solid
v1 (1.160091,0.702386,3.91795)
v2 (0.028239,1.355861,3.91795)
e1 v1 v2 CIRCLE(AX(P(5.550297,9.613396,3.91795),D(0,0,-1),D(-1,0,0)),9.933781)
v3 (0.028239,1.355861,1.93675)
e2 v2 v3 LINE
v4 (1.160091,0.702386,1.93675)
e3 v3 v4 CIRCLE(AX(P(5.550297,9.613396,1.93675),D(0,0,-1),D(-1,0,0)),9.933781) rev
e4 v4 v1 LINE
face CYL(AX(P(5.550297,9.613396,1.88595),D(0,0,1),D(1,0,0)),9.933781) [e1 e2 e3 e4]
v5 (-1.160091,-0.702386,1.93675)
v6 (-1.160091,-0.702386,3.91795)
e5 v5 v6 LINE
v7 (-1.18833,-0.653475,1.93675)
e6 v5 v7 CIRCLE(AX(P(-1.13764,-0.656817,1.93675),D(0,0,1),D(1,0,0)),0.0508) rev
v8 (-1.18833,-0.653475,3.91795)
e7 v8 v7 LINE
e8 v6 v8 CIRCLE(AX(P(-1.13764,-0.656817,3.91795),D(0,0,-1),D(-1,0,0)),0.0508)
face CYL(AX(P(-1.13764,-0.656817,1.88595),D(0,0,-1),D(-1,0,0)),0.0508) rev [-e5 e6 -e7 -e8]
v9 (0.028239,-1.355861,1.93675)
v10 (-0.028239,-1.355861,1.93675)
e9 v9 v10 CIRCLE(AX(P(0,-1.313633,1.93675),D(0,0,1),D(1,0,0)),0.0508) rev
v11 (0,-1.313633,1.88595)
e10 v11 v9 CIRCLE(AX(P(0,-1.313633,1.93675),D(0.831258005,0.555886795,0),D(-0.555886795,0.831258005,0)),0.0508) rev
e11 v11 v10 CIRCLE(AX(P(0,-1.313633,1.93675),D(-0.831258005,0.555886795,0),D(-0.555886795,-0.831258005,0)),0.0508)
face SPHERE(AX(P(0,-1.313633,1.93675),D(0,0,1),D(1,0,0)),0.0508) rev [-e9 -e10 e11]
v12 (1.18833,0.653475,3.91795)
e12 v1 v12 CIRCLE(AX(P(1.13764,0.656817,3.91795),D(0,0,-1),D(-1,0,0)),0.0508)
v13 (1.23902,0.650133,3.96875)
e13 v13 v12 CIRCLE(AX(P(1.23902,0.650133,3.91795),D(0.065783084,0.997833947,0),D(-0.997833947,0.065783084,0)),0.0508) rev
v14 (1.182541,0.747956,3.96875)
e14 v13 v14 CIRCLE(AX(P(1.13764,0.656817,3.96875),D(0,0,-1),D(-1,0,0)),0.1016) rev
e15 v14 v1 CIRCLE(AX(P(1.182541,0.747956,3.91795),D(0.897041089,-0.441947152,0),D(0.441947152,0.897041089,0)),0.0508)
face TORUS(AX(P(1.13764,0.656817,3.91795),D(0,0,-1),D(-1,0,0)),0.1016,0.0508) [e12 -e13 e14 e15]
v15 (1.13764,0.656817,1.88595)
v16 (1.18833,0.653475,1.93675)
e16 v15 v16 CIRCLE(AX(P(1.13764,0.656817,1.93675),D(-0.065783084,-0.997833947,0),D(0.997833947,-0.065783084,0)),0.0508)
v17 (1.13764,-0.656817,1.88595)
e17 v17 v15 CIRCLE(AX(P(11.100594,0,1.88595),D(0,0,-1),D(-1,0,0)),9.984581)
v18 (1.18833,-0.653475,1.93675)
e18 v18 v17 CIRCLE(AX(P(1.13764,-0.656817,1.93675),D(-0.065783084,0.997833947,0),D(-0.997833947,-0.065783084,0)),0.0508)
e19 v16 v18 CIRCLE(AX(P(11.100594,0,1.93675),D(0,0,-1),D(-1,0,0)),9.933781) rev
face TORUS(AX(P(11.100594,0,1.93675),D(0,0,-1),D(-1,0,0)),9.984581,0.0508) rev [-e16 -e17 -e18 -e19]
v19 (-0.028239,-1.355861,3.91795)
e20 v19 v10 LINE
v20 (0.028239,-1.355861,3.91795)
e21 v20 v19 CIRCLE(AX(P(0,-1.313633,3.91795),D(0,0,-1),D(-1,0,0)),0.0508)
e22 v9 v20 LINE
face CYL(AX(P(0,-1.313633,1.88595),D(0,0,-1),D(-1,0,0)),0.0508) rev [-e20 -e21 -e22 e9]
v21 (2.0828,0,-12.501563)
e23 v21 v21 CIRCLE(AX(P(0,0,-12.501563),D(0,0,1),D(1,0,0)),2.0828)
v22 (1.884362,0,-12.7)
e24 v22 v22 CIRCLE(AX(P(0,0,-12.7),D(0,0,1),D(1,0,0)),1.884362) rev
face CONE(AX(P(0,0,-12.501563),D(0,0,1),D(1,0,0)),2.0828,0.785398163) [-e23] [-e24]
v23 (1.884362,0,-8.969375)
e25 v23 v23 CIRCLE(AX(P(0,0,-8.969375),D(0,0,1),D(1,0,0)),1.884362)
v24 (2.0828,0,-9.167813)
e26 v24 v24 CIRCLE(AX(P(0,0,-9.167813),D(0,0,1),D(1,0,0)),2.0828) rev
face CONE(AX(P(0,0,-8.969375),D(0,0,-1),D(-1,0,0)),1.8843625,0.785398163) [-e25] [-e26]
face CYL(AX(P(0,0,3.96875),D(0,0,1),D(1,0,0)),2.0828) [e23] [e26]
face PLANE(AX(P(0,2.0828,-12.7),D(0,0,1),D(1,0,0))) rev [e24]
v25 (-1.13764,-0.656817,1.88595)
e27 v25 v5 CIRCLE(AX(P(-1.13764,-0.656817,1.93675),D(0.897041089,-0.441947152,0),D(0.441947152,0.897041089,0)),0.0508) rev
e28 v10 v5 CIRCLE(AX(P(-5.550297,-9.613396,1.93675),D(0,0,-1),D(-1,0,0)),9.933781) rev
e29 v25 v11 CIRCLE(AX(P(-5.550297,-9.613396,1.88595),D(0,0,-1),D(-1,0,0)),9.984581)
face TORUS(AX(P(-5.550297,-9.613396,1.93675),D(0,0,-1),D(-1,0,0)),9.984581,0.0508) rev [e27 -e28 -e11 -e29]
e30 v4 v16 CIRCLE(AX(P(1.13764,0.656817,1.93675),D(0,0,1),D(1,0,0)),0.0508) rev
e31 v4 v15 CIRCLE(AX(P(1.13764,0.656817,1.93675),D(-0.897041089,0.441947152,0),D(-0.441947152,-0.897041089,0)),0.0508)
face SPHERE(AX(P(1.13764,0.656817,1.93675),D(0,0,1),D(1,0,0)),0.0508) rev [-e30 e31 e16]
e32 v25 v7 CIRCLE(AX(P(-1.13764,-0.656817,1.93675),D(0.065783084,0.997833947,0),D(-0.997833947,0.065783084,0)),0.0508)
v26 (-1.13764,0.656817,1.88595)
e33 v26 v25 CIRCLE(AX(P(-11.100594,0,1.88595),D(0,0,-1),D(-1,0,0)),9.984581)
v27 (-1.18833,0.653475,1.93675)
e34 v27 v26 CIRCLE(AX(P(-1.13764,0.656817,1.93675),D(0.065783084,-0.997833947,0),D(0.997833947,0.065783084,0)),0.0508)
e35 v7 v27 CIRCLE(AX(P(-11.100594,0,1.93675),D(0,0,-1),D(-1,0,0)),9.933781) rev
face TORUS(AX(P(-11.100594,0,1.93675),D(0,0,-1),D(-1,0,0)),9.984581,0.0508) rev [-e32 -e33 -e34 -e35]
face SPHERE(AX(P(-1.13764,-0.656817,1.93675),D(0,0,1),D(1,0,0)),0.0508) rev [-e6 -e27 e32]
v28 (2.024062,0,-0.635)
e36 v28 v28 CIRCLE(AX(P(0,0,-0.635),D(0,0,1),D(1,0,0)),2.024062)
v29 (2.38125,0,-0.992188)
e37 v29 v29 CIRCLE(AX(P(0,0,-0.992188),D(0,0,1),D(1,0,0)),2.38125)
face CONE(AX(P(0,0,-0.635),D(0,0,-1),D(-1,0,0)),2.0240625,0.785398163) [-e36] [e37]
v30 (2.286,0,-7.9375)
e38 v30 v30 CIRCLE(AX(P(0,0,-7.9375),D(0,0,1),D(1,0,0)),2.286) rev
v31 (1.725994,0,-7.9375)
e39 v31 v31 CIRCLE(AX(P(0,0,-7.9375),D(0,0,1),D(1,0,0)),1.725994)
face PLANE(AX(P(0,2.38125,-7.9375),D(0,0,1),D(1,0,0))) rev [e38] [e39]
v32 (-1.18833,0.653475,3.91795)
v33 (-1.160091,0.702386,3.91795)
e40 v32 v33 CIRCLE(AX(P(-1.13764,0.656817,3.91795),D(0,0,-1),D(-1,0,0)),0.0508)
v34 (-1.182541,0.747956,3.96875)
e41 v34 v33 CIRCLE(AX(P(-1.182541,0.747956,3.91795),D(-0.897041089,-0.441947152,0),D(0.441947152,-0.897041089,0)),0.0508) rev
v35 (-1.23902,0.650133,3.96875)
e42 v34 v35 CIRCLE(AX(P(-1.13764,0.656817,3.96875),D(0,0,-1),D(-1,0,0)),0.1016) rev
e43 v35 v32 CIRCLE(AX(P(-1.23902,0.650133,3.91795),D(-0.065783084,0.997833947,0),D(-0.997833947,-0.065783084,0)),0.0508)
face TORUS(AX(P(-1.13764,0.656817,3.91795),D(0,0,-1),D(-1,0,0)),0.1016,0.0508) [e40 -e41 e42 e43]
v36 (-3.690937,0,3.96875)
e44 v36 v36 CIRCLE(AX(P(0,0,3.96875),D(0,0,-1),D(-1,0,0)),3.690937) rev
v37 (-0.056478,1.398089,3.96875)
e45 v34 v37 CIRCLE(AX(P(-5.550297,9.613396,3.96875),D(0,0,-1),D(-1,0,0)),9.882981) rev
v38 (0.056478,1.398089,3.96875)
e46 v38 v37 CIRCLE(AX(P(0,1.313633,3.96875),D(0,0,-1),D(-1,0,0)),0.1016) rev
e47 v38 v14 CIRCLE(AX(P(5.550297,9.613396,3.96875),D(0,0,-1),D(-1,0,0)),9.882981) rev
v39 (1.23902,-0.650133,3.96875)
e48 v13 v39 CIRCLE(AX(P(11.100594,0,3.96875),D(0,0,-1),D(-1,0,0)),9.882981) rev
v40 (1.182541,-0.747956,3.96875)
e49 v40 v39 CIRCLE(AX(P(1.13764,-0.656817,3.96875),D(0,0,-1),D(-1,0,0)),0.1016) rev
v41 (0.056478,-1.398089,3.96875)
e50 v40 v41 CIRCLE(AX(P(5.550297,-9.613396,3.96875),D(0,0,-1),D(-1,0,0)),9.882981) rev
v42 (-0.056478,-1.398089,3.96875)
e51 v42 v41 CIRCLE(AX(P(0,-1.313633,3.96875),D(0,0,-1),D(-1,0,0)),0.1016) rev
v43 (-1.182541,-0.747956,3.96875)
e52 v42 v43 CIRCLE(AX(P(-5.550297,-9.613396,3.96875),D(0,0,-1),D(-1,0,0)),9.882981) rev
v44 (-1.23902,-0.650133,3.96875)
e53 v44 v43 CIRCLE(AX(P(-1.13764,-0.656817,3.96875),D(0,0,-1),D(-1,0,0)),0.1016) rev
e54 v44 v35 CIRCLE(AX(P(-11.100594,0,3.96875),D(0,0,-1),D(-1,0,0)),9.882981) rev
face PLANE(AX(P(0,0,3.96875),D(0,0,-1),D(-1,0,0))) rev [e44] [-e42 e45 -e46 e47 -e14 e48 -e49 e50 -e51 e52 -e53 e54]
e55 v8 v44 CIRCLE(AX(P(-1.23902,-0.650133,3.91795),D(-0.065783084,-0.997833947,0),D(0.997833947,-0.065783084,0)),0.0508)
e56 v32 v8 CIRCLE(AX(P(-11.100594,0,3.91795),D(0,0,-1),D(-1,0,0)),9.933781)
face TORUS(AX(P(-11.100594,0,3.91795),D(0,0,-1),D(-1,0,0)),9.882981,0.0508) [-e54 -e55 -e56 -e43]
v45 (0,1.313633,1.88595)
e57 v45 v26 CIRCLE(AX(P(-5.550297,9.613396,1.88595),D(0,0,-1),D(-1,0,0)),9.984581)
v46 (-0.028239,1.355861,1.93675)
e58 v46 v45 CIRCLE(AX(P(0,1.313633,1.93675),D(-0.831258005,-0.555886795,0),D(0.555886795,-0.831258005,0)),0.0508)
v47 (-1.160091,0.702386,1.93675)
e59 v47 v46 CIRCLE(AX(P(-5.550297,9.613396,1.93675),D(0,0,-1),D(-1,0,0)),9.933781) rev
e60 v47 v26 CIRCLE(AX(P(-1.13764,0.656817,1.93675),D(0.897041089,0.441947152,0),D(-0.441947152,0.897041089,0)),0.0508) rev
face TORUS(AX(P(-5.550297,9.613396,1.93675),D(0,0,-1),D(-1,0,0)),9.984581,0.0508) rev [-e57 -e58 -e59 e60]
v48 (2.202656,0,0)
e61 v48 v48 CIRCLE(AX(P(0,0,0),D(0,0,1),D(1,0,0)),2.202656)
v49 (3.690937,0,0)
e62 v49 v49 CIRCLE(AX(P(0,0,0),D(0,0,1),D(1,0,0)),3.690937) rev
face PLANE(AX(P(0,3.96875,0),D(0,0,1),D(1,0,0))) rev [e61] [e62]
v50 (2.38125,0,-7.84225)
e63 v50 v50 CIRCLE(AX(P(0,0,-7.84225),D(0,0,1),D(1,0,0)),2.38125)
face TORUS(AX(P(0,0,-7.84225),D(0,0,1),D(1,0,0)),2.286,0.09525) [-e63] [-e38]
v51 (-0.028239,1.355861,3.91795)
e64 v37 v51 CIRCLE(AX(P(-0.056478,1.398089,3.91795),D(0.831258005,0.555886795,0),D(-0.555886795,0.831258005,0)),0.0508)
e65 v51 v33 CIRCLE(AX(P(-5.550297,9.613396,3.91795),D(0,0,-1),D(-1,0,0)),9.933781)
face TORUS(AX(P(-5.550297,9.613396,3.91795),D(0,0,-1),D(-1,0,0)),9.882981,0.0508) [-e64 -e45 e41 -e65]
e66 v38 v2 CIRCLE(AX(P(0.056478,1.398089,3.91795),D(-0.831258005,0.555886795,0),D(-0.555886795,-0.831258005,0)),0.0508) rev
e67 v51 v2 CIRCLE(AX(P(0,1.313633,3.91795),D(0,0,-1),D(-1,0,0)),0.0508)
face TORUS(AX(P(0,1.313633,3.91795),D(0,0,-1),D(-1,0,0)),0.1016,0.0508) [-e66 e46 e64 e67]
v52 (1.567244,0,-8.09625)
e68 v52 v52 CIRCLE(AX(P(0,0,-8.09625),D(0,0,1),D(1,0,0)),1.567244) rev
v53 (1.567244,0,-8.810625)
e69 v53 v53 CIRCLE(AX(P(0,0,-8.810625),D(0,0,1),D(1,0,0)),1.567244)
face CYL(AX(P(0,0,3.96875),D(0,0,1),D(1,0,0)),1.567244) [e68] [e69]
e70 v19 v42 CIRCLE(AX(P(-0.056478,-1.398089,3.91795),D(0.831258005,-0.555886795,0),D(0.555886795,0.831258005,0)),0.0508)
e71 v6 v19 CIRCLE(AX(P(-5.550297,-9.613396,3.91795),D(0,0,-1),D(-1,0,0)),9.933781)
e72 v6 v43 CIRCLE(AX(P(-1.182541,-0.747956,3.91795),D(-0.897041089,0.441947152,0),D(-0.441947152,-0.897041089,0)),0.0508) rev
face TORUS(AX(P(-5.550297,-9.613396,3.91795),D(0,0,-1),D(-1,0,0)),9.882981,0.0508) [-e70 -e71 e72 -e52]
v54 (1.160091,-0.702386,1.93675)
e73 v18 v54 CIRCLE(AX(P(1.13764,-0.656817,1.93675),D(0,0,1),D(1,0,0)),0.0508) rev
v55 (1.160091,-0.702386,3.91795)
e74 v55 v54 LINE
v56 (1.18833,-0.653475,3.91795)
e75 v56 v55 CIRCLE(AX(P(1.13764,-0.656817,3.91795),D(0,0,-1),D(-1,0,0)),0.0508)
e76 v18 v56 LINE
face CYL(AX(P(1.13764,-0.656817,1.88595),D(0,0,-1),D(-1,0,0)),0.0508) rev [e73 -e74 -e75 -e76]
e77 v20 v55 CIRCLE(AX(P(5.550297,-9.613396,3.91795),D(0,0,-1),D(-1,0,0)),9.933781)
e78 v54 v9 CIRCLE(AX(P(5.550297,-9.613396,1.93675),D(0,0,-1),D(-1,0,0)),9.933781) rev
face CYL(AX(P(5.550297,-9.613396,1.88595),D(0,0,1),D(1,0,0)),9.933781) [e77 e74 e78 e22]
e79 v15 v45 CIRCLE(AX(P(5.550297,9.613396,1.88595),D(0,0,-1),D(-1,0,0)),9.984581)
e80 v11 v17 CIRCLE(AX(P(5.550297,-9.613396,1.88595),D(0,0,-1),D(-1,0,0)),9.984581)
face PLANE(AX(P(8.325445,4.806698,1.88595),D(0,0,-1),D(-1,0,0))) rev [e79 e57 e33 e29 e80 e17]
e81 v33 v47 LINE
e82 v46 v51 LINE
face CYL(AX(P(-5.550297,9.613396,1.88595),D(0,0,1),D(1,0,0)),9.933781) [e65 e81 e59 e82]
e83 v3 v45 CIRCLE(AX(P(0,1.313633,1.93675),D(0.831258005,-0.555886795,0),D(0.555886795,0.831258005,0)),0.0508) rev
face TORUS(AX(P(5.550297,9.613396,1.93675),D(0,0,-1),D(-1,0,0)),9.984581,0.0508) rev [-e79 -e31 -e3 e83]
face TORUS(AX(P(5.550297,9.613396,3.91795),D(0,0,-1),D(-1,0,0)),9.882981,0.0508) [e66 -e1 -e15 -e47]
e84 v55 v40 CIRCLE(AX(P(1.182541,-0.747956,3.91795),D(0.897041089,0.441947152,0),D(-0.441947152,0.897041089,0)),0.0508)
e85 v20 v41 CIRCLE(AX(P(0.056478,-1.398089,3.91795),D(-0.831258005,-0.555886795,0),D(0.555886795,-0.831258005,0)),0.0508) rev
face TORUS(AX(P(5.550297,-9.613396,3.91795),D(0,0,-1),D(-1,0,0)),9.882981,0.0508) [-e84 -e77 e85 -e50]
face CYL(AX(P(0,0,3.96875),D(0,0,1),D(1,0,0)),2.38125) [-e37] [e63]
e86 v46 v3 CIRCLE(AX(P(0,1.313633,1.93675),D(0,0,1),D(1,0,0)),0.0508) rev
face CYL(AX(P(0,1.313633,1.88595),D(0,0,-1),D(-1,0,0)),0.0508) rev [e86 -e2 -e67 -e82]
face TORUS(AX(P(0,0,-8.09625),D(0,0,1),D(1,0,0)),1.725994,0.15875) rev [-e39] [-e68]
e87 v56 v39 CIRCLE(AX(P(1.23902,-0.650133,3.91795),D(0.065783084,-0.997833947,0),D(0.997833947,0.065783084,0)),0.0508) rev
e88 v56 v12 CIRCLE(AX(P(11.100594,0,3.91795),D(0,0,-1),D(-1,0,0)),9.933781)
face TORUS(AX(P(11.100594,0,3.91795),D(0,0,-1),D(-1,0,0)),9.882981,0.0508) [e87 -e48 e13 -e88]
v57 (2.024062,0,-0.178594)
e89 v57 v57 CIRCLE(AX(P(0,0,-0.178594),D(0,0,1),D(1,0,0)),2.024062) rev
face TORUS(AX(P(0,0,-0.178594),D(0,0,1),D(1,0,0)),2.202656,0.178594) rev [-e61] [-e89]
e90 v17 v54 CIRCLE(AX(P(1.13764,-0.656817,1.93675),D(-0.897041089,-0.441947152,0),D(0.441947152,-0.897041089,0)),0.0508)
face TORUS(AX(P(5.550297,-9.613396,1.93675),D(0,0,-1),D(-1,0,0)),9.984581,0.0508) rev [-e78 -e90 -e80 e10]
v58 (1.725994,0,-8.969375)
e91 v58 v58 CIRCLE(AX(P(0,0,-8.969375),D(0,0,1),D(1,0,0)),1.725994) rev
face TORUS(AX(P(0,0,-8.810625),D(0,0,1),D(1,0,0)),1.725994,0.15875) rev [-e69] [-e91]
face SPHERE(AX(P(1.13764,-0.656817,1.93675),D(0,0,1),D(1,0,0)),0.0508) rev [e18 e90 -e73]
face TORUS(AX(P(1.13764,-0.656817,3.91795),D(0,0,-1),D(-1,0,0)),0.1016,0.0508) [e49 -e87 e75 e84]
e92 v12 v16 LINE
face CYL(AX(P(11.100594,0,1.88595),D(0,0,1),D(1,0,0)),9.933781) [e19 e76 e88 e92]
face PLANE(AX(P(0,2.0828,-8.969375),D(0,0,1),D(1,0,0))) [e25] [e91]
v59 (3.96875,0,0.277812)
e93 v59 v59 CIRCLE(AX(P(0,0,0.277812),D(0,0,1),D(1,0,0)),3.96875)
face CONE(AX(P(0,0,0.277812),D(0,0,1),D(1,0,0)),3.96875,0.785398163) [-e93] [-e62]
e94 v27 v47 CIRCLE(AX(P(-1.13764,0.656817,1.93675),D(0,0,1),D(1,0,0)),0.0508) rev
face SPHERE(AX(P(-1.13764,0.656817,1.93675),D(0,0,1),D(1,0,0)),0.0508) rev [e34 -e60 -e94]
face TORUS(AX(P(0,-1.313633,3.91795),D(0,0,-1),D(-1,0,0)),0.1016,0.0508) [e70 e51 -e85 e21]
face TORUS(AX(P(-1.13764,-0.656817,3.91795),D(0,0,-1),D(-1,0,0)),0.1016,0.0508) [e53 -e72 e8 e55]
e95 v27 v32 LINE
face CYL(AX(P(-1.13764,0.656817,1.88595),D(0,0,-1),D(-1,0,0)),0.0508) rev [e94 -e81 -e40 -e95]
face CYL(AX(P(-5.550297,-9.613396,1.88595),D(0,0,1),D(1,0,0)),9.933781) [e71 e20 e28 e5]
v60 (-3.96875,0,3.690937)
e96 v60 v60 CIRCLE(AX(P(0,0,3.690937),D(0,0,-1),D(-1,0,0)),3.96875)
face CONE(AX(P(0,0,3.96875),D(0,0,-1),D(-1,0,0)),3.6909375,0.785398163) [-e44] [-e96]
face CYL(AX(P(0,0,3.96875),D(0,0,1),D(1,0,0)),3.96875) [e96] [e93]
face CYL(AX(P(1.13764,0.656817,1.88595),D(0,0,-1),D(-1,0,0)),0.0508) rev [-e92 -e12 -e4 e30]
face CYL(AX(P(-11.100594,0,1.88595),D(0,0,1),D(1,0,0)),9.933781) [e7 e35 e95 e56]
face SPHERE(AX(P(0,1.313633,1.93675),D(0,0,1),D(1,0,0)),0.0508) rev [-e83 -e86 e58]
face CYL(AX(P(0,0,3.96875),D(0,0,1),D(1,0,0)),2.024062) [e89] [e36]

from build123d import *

# Parameters (mm, degrees)
SKETCH4_W          = 0.9921875
SKETCH4_H          = 0.3571875
SKETCH4_W_2        = 1.031875
SKETCH4_H_2        = 0.515555748
CHAMFER1_SIZE      = 0.3571875
FILLET1_R          = 0.17859375
FILLET2_R          = 0.15875
CHAMFER2_SIZE      = 0.1984375
FILLET3_R          = 0.09525
CHAMFER3_SIZE      = 0.2778125
CUT_EXTRUDE1_DEPTH = 2.0828
FILLET4_R          = 0.0508


with BuildPart() as part:
    # Sketch3 → Revolve1 (revolve)
    with BuildSketch(Plane(origin=(0, 0, 0), x_dir=(0, 0, -1), z_dir=(1, 0, 0)), mode=Mode.PRIVATE) as revolve1_sk:
        Polygon((-3.96875, 3.96875), (0, 3.96875), (0, 2.38125), (7.9375, 2.38125), (7.9375, 2.0828), (12.7, 2.0828), (12.7, 0), (-3.96875, 0), align=None)
    revolve(revolve1_sk.sketch.rotate(Axis((0, 0, 3.96875), (0, 0, -1)), 90), axis=Axis((0, 0, 3.96875), (0, 0, -1)))

    # Sketch4 → Cut-Revolve1 (revolve, cut)
    with BuildSketch(Plane(origin=(0, 0, 0), x_dir=(0, 0, -1), z_dir=(1, 0, 0)), mode=Mode.PRIVATE) as cut_revolve1_sk:
        with Locations((0.49609375, 2.20265625)):
            Rectangle(SKETCH4_W, SKETCH4_H)
        with Locations((8.4534375, 1.825022126)):
            Rectangle(SKETCH4_W_2, SKETCH4_H_2)
    revolve(cut_revolve1_sk.sketch.rotate(Axis((0, 0, 3.96875), (0, 0, -1)), 90), axis=Axis((0, 0, 3.96875), (0, 0, -1)), mode=Mode.SUBTRACT)

    # Chamfer1
    chamfer1_edges = [part.edges().sort_by_distance(p)[0] for p in [
        (-2.0240625, 0, -0.9921875),
    ]]
    chamfer(chamfer1_edges, length=CHAMFER1_SIZE - 0.0001)  # a hair under: the kernel refuses the full size

    # Fillet1
    fillet1_edges = [part.edges().sort_by_distance(p)[0] for p in [
        (-2.0240625, 0, 0),
    ]]
    fillet(fillet1_edges, radius=FILLET1_R)

    # Fillet2
    fillet2_edges = [part.edges().sort_by_distance(p)[0] for p in [
        (-1.567244252, 0, -7.9375),
        (-1.567244252, 0, -8.969375),
    ]]
    fillet(fillet2_edges, radius=FILLET2_R)

    # Chamfer2
    chamfer2_edges = [part.edges().sort_by_distance(p)[0] for p in [
        (-2.0828, 0, -8.969375),
        (-2.0828, 0, -12.7),
    ]]
    chamfer(chamfer2_edges, length=CHAMFER2_SIZE)

    # Fillet3
    fillet3_edges = [part.edges().sort_by_distance(p)[0] for p in [
        (-2.38125, 0, -7.9375),
    ]]
    fillet(fillet3_edges, radius=FILLET3_R)

    # Chamfer3
    chamfer3_edges = [part.edges().sort_by_distance(p)[0] for p in [
        (-3.96875, 0, 0),
        (-3.96875, 0, 3.96875),
    ]]
    chamfer(chamfer3_edges, length=CHAMFER3_SIZE)

    # Sketch5 → Cut-Extrude1 (cut)
    with BuildSketch(Plane.XY.offset(3.96875)):
        with BuildLine():
            ThreePointArc((1.190625, 0.687407664), (0.58340625, 1.010489266), (0, 1.374815329))
            ThreePointArc((0, 1.374815329), (-0.58340625, 1.010489266), (-1.190625, 0.687407664))
            ThreePointArc((-1.190625, 0.687407664), (-1.1668125, 0), (-1.190625, -0.687407664))
            ThreePointArc((-1.190625, -0.687407664), (-0.58340625, -1.010489266), (0, -1.374815329))
            ThreePointArc((0, -1.374815329), (0.58340625, -1.010489266), (1.190625, -0.687407664))
            ThreePointArc((1.190625, -0.687407664), (1.1668125, 0), (1.190625, 0.687407664))
        make_face()
    extrude(amount=-CUT_EXTRUDE1_DEPTH, mode=Mode.SUBTRACT)

    # Fillet4
    fillet4_edges = [part.edges().sort_by_distance(p)[0] for p in [
        (1.1668125, 0, 1.88595),
        (1.190625, 0.687407664, 2.92735),
        (0.58340625, -1.010489266, 1.88595),
        (1.190625, -0.687407664, 2.92735),
        (-0.58340625, -1.010489266, 1.88595),
        (0, -1.374815329, 2.92735),
        (-1.1668125, 0, 1.88595),
        (-1.190625, -0.687407664, 2.92735),
        (-0.58340625, 1.010489266, 1.88595),
        (-1.190625, 0.687407664, 2.92735),
        (0.58340625, 1.010489266, 1.88595),
        (0, 1.374815329, 2.92735),
        (1.1668125, 0, 3.96875),
        (0.58340625, 1.010489266, 3.96875),
        (-0.58340625, 1.010489266, 3.96875),
        (-1.1668125, 0, 3.96875),
        (-0.58340625, -1.010489266, 3.96875),
        (0.58340625, -1.010489266, 3.96875),
    ]]
    fillet(fillet4_edges, radius=FILLET4_R)


solid = part.part
